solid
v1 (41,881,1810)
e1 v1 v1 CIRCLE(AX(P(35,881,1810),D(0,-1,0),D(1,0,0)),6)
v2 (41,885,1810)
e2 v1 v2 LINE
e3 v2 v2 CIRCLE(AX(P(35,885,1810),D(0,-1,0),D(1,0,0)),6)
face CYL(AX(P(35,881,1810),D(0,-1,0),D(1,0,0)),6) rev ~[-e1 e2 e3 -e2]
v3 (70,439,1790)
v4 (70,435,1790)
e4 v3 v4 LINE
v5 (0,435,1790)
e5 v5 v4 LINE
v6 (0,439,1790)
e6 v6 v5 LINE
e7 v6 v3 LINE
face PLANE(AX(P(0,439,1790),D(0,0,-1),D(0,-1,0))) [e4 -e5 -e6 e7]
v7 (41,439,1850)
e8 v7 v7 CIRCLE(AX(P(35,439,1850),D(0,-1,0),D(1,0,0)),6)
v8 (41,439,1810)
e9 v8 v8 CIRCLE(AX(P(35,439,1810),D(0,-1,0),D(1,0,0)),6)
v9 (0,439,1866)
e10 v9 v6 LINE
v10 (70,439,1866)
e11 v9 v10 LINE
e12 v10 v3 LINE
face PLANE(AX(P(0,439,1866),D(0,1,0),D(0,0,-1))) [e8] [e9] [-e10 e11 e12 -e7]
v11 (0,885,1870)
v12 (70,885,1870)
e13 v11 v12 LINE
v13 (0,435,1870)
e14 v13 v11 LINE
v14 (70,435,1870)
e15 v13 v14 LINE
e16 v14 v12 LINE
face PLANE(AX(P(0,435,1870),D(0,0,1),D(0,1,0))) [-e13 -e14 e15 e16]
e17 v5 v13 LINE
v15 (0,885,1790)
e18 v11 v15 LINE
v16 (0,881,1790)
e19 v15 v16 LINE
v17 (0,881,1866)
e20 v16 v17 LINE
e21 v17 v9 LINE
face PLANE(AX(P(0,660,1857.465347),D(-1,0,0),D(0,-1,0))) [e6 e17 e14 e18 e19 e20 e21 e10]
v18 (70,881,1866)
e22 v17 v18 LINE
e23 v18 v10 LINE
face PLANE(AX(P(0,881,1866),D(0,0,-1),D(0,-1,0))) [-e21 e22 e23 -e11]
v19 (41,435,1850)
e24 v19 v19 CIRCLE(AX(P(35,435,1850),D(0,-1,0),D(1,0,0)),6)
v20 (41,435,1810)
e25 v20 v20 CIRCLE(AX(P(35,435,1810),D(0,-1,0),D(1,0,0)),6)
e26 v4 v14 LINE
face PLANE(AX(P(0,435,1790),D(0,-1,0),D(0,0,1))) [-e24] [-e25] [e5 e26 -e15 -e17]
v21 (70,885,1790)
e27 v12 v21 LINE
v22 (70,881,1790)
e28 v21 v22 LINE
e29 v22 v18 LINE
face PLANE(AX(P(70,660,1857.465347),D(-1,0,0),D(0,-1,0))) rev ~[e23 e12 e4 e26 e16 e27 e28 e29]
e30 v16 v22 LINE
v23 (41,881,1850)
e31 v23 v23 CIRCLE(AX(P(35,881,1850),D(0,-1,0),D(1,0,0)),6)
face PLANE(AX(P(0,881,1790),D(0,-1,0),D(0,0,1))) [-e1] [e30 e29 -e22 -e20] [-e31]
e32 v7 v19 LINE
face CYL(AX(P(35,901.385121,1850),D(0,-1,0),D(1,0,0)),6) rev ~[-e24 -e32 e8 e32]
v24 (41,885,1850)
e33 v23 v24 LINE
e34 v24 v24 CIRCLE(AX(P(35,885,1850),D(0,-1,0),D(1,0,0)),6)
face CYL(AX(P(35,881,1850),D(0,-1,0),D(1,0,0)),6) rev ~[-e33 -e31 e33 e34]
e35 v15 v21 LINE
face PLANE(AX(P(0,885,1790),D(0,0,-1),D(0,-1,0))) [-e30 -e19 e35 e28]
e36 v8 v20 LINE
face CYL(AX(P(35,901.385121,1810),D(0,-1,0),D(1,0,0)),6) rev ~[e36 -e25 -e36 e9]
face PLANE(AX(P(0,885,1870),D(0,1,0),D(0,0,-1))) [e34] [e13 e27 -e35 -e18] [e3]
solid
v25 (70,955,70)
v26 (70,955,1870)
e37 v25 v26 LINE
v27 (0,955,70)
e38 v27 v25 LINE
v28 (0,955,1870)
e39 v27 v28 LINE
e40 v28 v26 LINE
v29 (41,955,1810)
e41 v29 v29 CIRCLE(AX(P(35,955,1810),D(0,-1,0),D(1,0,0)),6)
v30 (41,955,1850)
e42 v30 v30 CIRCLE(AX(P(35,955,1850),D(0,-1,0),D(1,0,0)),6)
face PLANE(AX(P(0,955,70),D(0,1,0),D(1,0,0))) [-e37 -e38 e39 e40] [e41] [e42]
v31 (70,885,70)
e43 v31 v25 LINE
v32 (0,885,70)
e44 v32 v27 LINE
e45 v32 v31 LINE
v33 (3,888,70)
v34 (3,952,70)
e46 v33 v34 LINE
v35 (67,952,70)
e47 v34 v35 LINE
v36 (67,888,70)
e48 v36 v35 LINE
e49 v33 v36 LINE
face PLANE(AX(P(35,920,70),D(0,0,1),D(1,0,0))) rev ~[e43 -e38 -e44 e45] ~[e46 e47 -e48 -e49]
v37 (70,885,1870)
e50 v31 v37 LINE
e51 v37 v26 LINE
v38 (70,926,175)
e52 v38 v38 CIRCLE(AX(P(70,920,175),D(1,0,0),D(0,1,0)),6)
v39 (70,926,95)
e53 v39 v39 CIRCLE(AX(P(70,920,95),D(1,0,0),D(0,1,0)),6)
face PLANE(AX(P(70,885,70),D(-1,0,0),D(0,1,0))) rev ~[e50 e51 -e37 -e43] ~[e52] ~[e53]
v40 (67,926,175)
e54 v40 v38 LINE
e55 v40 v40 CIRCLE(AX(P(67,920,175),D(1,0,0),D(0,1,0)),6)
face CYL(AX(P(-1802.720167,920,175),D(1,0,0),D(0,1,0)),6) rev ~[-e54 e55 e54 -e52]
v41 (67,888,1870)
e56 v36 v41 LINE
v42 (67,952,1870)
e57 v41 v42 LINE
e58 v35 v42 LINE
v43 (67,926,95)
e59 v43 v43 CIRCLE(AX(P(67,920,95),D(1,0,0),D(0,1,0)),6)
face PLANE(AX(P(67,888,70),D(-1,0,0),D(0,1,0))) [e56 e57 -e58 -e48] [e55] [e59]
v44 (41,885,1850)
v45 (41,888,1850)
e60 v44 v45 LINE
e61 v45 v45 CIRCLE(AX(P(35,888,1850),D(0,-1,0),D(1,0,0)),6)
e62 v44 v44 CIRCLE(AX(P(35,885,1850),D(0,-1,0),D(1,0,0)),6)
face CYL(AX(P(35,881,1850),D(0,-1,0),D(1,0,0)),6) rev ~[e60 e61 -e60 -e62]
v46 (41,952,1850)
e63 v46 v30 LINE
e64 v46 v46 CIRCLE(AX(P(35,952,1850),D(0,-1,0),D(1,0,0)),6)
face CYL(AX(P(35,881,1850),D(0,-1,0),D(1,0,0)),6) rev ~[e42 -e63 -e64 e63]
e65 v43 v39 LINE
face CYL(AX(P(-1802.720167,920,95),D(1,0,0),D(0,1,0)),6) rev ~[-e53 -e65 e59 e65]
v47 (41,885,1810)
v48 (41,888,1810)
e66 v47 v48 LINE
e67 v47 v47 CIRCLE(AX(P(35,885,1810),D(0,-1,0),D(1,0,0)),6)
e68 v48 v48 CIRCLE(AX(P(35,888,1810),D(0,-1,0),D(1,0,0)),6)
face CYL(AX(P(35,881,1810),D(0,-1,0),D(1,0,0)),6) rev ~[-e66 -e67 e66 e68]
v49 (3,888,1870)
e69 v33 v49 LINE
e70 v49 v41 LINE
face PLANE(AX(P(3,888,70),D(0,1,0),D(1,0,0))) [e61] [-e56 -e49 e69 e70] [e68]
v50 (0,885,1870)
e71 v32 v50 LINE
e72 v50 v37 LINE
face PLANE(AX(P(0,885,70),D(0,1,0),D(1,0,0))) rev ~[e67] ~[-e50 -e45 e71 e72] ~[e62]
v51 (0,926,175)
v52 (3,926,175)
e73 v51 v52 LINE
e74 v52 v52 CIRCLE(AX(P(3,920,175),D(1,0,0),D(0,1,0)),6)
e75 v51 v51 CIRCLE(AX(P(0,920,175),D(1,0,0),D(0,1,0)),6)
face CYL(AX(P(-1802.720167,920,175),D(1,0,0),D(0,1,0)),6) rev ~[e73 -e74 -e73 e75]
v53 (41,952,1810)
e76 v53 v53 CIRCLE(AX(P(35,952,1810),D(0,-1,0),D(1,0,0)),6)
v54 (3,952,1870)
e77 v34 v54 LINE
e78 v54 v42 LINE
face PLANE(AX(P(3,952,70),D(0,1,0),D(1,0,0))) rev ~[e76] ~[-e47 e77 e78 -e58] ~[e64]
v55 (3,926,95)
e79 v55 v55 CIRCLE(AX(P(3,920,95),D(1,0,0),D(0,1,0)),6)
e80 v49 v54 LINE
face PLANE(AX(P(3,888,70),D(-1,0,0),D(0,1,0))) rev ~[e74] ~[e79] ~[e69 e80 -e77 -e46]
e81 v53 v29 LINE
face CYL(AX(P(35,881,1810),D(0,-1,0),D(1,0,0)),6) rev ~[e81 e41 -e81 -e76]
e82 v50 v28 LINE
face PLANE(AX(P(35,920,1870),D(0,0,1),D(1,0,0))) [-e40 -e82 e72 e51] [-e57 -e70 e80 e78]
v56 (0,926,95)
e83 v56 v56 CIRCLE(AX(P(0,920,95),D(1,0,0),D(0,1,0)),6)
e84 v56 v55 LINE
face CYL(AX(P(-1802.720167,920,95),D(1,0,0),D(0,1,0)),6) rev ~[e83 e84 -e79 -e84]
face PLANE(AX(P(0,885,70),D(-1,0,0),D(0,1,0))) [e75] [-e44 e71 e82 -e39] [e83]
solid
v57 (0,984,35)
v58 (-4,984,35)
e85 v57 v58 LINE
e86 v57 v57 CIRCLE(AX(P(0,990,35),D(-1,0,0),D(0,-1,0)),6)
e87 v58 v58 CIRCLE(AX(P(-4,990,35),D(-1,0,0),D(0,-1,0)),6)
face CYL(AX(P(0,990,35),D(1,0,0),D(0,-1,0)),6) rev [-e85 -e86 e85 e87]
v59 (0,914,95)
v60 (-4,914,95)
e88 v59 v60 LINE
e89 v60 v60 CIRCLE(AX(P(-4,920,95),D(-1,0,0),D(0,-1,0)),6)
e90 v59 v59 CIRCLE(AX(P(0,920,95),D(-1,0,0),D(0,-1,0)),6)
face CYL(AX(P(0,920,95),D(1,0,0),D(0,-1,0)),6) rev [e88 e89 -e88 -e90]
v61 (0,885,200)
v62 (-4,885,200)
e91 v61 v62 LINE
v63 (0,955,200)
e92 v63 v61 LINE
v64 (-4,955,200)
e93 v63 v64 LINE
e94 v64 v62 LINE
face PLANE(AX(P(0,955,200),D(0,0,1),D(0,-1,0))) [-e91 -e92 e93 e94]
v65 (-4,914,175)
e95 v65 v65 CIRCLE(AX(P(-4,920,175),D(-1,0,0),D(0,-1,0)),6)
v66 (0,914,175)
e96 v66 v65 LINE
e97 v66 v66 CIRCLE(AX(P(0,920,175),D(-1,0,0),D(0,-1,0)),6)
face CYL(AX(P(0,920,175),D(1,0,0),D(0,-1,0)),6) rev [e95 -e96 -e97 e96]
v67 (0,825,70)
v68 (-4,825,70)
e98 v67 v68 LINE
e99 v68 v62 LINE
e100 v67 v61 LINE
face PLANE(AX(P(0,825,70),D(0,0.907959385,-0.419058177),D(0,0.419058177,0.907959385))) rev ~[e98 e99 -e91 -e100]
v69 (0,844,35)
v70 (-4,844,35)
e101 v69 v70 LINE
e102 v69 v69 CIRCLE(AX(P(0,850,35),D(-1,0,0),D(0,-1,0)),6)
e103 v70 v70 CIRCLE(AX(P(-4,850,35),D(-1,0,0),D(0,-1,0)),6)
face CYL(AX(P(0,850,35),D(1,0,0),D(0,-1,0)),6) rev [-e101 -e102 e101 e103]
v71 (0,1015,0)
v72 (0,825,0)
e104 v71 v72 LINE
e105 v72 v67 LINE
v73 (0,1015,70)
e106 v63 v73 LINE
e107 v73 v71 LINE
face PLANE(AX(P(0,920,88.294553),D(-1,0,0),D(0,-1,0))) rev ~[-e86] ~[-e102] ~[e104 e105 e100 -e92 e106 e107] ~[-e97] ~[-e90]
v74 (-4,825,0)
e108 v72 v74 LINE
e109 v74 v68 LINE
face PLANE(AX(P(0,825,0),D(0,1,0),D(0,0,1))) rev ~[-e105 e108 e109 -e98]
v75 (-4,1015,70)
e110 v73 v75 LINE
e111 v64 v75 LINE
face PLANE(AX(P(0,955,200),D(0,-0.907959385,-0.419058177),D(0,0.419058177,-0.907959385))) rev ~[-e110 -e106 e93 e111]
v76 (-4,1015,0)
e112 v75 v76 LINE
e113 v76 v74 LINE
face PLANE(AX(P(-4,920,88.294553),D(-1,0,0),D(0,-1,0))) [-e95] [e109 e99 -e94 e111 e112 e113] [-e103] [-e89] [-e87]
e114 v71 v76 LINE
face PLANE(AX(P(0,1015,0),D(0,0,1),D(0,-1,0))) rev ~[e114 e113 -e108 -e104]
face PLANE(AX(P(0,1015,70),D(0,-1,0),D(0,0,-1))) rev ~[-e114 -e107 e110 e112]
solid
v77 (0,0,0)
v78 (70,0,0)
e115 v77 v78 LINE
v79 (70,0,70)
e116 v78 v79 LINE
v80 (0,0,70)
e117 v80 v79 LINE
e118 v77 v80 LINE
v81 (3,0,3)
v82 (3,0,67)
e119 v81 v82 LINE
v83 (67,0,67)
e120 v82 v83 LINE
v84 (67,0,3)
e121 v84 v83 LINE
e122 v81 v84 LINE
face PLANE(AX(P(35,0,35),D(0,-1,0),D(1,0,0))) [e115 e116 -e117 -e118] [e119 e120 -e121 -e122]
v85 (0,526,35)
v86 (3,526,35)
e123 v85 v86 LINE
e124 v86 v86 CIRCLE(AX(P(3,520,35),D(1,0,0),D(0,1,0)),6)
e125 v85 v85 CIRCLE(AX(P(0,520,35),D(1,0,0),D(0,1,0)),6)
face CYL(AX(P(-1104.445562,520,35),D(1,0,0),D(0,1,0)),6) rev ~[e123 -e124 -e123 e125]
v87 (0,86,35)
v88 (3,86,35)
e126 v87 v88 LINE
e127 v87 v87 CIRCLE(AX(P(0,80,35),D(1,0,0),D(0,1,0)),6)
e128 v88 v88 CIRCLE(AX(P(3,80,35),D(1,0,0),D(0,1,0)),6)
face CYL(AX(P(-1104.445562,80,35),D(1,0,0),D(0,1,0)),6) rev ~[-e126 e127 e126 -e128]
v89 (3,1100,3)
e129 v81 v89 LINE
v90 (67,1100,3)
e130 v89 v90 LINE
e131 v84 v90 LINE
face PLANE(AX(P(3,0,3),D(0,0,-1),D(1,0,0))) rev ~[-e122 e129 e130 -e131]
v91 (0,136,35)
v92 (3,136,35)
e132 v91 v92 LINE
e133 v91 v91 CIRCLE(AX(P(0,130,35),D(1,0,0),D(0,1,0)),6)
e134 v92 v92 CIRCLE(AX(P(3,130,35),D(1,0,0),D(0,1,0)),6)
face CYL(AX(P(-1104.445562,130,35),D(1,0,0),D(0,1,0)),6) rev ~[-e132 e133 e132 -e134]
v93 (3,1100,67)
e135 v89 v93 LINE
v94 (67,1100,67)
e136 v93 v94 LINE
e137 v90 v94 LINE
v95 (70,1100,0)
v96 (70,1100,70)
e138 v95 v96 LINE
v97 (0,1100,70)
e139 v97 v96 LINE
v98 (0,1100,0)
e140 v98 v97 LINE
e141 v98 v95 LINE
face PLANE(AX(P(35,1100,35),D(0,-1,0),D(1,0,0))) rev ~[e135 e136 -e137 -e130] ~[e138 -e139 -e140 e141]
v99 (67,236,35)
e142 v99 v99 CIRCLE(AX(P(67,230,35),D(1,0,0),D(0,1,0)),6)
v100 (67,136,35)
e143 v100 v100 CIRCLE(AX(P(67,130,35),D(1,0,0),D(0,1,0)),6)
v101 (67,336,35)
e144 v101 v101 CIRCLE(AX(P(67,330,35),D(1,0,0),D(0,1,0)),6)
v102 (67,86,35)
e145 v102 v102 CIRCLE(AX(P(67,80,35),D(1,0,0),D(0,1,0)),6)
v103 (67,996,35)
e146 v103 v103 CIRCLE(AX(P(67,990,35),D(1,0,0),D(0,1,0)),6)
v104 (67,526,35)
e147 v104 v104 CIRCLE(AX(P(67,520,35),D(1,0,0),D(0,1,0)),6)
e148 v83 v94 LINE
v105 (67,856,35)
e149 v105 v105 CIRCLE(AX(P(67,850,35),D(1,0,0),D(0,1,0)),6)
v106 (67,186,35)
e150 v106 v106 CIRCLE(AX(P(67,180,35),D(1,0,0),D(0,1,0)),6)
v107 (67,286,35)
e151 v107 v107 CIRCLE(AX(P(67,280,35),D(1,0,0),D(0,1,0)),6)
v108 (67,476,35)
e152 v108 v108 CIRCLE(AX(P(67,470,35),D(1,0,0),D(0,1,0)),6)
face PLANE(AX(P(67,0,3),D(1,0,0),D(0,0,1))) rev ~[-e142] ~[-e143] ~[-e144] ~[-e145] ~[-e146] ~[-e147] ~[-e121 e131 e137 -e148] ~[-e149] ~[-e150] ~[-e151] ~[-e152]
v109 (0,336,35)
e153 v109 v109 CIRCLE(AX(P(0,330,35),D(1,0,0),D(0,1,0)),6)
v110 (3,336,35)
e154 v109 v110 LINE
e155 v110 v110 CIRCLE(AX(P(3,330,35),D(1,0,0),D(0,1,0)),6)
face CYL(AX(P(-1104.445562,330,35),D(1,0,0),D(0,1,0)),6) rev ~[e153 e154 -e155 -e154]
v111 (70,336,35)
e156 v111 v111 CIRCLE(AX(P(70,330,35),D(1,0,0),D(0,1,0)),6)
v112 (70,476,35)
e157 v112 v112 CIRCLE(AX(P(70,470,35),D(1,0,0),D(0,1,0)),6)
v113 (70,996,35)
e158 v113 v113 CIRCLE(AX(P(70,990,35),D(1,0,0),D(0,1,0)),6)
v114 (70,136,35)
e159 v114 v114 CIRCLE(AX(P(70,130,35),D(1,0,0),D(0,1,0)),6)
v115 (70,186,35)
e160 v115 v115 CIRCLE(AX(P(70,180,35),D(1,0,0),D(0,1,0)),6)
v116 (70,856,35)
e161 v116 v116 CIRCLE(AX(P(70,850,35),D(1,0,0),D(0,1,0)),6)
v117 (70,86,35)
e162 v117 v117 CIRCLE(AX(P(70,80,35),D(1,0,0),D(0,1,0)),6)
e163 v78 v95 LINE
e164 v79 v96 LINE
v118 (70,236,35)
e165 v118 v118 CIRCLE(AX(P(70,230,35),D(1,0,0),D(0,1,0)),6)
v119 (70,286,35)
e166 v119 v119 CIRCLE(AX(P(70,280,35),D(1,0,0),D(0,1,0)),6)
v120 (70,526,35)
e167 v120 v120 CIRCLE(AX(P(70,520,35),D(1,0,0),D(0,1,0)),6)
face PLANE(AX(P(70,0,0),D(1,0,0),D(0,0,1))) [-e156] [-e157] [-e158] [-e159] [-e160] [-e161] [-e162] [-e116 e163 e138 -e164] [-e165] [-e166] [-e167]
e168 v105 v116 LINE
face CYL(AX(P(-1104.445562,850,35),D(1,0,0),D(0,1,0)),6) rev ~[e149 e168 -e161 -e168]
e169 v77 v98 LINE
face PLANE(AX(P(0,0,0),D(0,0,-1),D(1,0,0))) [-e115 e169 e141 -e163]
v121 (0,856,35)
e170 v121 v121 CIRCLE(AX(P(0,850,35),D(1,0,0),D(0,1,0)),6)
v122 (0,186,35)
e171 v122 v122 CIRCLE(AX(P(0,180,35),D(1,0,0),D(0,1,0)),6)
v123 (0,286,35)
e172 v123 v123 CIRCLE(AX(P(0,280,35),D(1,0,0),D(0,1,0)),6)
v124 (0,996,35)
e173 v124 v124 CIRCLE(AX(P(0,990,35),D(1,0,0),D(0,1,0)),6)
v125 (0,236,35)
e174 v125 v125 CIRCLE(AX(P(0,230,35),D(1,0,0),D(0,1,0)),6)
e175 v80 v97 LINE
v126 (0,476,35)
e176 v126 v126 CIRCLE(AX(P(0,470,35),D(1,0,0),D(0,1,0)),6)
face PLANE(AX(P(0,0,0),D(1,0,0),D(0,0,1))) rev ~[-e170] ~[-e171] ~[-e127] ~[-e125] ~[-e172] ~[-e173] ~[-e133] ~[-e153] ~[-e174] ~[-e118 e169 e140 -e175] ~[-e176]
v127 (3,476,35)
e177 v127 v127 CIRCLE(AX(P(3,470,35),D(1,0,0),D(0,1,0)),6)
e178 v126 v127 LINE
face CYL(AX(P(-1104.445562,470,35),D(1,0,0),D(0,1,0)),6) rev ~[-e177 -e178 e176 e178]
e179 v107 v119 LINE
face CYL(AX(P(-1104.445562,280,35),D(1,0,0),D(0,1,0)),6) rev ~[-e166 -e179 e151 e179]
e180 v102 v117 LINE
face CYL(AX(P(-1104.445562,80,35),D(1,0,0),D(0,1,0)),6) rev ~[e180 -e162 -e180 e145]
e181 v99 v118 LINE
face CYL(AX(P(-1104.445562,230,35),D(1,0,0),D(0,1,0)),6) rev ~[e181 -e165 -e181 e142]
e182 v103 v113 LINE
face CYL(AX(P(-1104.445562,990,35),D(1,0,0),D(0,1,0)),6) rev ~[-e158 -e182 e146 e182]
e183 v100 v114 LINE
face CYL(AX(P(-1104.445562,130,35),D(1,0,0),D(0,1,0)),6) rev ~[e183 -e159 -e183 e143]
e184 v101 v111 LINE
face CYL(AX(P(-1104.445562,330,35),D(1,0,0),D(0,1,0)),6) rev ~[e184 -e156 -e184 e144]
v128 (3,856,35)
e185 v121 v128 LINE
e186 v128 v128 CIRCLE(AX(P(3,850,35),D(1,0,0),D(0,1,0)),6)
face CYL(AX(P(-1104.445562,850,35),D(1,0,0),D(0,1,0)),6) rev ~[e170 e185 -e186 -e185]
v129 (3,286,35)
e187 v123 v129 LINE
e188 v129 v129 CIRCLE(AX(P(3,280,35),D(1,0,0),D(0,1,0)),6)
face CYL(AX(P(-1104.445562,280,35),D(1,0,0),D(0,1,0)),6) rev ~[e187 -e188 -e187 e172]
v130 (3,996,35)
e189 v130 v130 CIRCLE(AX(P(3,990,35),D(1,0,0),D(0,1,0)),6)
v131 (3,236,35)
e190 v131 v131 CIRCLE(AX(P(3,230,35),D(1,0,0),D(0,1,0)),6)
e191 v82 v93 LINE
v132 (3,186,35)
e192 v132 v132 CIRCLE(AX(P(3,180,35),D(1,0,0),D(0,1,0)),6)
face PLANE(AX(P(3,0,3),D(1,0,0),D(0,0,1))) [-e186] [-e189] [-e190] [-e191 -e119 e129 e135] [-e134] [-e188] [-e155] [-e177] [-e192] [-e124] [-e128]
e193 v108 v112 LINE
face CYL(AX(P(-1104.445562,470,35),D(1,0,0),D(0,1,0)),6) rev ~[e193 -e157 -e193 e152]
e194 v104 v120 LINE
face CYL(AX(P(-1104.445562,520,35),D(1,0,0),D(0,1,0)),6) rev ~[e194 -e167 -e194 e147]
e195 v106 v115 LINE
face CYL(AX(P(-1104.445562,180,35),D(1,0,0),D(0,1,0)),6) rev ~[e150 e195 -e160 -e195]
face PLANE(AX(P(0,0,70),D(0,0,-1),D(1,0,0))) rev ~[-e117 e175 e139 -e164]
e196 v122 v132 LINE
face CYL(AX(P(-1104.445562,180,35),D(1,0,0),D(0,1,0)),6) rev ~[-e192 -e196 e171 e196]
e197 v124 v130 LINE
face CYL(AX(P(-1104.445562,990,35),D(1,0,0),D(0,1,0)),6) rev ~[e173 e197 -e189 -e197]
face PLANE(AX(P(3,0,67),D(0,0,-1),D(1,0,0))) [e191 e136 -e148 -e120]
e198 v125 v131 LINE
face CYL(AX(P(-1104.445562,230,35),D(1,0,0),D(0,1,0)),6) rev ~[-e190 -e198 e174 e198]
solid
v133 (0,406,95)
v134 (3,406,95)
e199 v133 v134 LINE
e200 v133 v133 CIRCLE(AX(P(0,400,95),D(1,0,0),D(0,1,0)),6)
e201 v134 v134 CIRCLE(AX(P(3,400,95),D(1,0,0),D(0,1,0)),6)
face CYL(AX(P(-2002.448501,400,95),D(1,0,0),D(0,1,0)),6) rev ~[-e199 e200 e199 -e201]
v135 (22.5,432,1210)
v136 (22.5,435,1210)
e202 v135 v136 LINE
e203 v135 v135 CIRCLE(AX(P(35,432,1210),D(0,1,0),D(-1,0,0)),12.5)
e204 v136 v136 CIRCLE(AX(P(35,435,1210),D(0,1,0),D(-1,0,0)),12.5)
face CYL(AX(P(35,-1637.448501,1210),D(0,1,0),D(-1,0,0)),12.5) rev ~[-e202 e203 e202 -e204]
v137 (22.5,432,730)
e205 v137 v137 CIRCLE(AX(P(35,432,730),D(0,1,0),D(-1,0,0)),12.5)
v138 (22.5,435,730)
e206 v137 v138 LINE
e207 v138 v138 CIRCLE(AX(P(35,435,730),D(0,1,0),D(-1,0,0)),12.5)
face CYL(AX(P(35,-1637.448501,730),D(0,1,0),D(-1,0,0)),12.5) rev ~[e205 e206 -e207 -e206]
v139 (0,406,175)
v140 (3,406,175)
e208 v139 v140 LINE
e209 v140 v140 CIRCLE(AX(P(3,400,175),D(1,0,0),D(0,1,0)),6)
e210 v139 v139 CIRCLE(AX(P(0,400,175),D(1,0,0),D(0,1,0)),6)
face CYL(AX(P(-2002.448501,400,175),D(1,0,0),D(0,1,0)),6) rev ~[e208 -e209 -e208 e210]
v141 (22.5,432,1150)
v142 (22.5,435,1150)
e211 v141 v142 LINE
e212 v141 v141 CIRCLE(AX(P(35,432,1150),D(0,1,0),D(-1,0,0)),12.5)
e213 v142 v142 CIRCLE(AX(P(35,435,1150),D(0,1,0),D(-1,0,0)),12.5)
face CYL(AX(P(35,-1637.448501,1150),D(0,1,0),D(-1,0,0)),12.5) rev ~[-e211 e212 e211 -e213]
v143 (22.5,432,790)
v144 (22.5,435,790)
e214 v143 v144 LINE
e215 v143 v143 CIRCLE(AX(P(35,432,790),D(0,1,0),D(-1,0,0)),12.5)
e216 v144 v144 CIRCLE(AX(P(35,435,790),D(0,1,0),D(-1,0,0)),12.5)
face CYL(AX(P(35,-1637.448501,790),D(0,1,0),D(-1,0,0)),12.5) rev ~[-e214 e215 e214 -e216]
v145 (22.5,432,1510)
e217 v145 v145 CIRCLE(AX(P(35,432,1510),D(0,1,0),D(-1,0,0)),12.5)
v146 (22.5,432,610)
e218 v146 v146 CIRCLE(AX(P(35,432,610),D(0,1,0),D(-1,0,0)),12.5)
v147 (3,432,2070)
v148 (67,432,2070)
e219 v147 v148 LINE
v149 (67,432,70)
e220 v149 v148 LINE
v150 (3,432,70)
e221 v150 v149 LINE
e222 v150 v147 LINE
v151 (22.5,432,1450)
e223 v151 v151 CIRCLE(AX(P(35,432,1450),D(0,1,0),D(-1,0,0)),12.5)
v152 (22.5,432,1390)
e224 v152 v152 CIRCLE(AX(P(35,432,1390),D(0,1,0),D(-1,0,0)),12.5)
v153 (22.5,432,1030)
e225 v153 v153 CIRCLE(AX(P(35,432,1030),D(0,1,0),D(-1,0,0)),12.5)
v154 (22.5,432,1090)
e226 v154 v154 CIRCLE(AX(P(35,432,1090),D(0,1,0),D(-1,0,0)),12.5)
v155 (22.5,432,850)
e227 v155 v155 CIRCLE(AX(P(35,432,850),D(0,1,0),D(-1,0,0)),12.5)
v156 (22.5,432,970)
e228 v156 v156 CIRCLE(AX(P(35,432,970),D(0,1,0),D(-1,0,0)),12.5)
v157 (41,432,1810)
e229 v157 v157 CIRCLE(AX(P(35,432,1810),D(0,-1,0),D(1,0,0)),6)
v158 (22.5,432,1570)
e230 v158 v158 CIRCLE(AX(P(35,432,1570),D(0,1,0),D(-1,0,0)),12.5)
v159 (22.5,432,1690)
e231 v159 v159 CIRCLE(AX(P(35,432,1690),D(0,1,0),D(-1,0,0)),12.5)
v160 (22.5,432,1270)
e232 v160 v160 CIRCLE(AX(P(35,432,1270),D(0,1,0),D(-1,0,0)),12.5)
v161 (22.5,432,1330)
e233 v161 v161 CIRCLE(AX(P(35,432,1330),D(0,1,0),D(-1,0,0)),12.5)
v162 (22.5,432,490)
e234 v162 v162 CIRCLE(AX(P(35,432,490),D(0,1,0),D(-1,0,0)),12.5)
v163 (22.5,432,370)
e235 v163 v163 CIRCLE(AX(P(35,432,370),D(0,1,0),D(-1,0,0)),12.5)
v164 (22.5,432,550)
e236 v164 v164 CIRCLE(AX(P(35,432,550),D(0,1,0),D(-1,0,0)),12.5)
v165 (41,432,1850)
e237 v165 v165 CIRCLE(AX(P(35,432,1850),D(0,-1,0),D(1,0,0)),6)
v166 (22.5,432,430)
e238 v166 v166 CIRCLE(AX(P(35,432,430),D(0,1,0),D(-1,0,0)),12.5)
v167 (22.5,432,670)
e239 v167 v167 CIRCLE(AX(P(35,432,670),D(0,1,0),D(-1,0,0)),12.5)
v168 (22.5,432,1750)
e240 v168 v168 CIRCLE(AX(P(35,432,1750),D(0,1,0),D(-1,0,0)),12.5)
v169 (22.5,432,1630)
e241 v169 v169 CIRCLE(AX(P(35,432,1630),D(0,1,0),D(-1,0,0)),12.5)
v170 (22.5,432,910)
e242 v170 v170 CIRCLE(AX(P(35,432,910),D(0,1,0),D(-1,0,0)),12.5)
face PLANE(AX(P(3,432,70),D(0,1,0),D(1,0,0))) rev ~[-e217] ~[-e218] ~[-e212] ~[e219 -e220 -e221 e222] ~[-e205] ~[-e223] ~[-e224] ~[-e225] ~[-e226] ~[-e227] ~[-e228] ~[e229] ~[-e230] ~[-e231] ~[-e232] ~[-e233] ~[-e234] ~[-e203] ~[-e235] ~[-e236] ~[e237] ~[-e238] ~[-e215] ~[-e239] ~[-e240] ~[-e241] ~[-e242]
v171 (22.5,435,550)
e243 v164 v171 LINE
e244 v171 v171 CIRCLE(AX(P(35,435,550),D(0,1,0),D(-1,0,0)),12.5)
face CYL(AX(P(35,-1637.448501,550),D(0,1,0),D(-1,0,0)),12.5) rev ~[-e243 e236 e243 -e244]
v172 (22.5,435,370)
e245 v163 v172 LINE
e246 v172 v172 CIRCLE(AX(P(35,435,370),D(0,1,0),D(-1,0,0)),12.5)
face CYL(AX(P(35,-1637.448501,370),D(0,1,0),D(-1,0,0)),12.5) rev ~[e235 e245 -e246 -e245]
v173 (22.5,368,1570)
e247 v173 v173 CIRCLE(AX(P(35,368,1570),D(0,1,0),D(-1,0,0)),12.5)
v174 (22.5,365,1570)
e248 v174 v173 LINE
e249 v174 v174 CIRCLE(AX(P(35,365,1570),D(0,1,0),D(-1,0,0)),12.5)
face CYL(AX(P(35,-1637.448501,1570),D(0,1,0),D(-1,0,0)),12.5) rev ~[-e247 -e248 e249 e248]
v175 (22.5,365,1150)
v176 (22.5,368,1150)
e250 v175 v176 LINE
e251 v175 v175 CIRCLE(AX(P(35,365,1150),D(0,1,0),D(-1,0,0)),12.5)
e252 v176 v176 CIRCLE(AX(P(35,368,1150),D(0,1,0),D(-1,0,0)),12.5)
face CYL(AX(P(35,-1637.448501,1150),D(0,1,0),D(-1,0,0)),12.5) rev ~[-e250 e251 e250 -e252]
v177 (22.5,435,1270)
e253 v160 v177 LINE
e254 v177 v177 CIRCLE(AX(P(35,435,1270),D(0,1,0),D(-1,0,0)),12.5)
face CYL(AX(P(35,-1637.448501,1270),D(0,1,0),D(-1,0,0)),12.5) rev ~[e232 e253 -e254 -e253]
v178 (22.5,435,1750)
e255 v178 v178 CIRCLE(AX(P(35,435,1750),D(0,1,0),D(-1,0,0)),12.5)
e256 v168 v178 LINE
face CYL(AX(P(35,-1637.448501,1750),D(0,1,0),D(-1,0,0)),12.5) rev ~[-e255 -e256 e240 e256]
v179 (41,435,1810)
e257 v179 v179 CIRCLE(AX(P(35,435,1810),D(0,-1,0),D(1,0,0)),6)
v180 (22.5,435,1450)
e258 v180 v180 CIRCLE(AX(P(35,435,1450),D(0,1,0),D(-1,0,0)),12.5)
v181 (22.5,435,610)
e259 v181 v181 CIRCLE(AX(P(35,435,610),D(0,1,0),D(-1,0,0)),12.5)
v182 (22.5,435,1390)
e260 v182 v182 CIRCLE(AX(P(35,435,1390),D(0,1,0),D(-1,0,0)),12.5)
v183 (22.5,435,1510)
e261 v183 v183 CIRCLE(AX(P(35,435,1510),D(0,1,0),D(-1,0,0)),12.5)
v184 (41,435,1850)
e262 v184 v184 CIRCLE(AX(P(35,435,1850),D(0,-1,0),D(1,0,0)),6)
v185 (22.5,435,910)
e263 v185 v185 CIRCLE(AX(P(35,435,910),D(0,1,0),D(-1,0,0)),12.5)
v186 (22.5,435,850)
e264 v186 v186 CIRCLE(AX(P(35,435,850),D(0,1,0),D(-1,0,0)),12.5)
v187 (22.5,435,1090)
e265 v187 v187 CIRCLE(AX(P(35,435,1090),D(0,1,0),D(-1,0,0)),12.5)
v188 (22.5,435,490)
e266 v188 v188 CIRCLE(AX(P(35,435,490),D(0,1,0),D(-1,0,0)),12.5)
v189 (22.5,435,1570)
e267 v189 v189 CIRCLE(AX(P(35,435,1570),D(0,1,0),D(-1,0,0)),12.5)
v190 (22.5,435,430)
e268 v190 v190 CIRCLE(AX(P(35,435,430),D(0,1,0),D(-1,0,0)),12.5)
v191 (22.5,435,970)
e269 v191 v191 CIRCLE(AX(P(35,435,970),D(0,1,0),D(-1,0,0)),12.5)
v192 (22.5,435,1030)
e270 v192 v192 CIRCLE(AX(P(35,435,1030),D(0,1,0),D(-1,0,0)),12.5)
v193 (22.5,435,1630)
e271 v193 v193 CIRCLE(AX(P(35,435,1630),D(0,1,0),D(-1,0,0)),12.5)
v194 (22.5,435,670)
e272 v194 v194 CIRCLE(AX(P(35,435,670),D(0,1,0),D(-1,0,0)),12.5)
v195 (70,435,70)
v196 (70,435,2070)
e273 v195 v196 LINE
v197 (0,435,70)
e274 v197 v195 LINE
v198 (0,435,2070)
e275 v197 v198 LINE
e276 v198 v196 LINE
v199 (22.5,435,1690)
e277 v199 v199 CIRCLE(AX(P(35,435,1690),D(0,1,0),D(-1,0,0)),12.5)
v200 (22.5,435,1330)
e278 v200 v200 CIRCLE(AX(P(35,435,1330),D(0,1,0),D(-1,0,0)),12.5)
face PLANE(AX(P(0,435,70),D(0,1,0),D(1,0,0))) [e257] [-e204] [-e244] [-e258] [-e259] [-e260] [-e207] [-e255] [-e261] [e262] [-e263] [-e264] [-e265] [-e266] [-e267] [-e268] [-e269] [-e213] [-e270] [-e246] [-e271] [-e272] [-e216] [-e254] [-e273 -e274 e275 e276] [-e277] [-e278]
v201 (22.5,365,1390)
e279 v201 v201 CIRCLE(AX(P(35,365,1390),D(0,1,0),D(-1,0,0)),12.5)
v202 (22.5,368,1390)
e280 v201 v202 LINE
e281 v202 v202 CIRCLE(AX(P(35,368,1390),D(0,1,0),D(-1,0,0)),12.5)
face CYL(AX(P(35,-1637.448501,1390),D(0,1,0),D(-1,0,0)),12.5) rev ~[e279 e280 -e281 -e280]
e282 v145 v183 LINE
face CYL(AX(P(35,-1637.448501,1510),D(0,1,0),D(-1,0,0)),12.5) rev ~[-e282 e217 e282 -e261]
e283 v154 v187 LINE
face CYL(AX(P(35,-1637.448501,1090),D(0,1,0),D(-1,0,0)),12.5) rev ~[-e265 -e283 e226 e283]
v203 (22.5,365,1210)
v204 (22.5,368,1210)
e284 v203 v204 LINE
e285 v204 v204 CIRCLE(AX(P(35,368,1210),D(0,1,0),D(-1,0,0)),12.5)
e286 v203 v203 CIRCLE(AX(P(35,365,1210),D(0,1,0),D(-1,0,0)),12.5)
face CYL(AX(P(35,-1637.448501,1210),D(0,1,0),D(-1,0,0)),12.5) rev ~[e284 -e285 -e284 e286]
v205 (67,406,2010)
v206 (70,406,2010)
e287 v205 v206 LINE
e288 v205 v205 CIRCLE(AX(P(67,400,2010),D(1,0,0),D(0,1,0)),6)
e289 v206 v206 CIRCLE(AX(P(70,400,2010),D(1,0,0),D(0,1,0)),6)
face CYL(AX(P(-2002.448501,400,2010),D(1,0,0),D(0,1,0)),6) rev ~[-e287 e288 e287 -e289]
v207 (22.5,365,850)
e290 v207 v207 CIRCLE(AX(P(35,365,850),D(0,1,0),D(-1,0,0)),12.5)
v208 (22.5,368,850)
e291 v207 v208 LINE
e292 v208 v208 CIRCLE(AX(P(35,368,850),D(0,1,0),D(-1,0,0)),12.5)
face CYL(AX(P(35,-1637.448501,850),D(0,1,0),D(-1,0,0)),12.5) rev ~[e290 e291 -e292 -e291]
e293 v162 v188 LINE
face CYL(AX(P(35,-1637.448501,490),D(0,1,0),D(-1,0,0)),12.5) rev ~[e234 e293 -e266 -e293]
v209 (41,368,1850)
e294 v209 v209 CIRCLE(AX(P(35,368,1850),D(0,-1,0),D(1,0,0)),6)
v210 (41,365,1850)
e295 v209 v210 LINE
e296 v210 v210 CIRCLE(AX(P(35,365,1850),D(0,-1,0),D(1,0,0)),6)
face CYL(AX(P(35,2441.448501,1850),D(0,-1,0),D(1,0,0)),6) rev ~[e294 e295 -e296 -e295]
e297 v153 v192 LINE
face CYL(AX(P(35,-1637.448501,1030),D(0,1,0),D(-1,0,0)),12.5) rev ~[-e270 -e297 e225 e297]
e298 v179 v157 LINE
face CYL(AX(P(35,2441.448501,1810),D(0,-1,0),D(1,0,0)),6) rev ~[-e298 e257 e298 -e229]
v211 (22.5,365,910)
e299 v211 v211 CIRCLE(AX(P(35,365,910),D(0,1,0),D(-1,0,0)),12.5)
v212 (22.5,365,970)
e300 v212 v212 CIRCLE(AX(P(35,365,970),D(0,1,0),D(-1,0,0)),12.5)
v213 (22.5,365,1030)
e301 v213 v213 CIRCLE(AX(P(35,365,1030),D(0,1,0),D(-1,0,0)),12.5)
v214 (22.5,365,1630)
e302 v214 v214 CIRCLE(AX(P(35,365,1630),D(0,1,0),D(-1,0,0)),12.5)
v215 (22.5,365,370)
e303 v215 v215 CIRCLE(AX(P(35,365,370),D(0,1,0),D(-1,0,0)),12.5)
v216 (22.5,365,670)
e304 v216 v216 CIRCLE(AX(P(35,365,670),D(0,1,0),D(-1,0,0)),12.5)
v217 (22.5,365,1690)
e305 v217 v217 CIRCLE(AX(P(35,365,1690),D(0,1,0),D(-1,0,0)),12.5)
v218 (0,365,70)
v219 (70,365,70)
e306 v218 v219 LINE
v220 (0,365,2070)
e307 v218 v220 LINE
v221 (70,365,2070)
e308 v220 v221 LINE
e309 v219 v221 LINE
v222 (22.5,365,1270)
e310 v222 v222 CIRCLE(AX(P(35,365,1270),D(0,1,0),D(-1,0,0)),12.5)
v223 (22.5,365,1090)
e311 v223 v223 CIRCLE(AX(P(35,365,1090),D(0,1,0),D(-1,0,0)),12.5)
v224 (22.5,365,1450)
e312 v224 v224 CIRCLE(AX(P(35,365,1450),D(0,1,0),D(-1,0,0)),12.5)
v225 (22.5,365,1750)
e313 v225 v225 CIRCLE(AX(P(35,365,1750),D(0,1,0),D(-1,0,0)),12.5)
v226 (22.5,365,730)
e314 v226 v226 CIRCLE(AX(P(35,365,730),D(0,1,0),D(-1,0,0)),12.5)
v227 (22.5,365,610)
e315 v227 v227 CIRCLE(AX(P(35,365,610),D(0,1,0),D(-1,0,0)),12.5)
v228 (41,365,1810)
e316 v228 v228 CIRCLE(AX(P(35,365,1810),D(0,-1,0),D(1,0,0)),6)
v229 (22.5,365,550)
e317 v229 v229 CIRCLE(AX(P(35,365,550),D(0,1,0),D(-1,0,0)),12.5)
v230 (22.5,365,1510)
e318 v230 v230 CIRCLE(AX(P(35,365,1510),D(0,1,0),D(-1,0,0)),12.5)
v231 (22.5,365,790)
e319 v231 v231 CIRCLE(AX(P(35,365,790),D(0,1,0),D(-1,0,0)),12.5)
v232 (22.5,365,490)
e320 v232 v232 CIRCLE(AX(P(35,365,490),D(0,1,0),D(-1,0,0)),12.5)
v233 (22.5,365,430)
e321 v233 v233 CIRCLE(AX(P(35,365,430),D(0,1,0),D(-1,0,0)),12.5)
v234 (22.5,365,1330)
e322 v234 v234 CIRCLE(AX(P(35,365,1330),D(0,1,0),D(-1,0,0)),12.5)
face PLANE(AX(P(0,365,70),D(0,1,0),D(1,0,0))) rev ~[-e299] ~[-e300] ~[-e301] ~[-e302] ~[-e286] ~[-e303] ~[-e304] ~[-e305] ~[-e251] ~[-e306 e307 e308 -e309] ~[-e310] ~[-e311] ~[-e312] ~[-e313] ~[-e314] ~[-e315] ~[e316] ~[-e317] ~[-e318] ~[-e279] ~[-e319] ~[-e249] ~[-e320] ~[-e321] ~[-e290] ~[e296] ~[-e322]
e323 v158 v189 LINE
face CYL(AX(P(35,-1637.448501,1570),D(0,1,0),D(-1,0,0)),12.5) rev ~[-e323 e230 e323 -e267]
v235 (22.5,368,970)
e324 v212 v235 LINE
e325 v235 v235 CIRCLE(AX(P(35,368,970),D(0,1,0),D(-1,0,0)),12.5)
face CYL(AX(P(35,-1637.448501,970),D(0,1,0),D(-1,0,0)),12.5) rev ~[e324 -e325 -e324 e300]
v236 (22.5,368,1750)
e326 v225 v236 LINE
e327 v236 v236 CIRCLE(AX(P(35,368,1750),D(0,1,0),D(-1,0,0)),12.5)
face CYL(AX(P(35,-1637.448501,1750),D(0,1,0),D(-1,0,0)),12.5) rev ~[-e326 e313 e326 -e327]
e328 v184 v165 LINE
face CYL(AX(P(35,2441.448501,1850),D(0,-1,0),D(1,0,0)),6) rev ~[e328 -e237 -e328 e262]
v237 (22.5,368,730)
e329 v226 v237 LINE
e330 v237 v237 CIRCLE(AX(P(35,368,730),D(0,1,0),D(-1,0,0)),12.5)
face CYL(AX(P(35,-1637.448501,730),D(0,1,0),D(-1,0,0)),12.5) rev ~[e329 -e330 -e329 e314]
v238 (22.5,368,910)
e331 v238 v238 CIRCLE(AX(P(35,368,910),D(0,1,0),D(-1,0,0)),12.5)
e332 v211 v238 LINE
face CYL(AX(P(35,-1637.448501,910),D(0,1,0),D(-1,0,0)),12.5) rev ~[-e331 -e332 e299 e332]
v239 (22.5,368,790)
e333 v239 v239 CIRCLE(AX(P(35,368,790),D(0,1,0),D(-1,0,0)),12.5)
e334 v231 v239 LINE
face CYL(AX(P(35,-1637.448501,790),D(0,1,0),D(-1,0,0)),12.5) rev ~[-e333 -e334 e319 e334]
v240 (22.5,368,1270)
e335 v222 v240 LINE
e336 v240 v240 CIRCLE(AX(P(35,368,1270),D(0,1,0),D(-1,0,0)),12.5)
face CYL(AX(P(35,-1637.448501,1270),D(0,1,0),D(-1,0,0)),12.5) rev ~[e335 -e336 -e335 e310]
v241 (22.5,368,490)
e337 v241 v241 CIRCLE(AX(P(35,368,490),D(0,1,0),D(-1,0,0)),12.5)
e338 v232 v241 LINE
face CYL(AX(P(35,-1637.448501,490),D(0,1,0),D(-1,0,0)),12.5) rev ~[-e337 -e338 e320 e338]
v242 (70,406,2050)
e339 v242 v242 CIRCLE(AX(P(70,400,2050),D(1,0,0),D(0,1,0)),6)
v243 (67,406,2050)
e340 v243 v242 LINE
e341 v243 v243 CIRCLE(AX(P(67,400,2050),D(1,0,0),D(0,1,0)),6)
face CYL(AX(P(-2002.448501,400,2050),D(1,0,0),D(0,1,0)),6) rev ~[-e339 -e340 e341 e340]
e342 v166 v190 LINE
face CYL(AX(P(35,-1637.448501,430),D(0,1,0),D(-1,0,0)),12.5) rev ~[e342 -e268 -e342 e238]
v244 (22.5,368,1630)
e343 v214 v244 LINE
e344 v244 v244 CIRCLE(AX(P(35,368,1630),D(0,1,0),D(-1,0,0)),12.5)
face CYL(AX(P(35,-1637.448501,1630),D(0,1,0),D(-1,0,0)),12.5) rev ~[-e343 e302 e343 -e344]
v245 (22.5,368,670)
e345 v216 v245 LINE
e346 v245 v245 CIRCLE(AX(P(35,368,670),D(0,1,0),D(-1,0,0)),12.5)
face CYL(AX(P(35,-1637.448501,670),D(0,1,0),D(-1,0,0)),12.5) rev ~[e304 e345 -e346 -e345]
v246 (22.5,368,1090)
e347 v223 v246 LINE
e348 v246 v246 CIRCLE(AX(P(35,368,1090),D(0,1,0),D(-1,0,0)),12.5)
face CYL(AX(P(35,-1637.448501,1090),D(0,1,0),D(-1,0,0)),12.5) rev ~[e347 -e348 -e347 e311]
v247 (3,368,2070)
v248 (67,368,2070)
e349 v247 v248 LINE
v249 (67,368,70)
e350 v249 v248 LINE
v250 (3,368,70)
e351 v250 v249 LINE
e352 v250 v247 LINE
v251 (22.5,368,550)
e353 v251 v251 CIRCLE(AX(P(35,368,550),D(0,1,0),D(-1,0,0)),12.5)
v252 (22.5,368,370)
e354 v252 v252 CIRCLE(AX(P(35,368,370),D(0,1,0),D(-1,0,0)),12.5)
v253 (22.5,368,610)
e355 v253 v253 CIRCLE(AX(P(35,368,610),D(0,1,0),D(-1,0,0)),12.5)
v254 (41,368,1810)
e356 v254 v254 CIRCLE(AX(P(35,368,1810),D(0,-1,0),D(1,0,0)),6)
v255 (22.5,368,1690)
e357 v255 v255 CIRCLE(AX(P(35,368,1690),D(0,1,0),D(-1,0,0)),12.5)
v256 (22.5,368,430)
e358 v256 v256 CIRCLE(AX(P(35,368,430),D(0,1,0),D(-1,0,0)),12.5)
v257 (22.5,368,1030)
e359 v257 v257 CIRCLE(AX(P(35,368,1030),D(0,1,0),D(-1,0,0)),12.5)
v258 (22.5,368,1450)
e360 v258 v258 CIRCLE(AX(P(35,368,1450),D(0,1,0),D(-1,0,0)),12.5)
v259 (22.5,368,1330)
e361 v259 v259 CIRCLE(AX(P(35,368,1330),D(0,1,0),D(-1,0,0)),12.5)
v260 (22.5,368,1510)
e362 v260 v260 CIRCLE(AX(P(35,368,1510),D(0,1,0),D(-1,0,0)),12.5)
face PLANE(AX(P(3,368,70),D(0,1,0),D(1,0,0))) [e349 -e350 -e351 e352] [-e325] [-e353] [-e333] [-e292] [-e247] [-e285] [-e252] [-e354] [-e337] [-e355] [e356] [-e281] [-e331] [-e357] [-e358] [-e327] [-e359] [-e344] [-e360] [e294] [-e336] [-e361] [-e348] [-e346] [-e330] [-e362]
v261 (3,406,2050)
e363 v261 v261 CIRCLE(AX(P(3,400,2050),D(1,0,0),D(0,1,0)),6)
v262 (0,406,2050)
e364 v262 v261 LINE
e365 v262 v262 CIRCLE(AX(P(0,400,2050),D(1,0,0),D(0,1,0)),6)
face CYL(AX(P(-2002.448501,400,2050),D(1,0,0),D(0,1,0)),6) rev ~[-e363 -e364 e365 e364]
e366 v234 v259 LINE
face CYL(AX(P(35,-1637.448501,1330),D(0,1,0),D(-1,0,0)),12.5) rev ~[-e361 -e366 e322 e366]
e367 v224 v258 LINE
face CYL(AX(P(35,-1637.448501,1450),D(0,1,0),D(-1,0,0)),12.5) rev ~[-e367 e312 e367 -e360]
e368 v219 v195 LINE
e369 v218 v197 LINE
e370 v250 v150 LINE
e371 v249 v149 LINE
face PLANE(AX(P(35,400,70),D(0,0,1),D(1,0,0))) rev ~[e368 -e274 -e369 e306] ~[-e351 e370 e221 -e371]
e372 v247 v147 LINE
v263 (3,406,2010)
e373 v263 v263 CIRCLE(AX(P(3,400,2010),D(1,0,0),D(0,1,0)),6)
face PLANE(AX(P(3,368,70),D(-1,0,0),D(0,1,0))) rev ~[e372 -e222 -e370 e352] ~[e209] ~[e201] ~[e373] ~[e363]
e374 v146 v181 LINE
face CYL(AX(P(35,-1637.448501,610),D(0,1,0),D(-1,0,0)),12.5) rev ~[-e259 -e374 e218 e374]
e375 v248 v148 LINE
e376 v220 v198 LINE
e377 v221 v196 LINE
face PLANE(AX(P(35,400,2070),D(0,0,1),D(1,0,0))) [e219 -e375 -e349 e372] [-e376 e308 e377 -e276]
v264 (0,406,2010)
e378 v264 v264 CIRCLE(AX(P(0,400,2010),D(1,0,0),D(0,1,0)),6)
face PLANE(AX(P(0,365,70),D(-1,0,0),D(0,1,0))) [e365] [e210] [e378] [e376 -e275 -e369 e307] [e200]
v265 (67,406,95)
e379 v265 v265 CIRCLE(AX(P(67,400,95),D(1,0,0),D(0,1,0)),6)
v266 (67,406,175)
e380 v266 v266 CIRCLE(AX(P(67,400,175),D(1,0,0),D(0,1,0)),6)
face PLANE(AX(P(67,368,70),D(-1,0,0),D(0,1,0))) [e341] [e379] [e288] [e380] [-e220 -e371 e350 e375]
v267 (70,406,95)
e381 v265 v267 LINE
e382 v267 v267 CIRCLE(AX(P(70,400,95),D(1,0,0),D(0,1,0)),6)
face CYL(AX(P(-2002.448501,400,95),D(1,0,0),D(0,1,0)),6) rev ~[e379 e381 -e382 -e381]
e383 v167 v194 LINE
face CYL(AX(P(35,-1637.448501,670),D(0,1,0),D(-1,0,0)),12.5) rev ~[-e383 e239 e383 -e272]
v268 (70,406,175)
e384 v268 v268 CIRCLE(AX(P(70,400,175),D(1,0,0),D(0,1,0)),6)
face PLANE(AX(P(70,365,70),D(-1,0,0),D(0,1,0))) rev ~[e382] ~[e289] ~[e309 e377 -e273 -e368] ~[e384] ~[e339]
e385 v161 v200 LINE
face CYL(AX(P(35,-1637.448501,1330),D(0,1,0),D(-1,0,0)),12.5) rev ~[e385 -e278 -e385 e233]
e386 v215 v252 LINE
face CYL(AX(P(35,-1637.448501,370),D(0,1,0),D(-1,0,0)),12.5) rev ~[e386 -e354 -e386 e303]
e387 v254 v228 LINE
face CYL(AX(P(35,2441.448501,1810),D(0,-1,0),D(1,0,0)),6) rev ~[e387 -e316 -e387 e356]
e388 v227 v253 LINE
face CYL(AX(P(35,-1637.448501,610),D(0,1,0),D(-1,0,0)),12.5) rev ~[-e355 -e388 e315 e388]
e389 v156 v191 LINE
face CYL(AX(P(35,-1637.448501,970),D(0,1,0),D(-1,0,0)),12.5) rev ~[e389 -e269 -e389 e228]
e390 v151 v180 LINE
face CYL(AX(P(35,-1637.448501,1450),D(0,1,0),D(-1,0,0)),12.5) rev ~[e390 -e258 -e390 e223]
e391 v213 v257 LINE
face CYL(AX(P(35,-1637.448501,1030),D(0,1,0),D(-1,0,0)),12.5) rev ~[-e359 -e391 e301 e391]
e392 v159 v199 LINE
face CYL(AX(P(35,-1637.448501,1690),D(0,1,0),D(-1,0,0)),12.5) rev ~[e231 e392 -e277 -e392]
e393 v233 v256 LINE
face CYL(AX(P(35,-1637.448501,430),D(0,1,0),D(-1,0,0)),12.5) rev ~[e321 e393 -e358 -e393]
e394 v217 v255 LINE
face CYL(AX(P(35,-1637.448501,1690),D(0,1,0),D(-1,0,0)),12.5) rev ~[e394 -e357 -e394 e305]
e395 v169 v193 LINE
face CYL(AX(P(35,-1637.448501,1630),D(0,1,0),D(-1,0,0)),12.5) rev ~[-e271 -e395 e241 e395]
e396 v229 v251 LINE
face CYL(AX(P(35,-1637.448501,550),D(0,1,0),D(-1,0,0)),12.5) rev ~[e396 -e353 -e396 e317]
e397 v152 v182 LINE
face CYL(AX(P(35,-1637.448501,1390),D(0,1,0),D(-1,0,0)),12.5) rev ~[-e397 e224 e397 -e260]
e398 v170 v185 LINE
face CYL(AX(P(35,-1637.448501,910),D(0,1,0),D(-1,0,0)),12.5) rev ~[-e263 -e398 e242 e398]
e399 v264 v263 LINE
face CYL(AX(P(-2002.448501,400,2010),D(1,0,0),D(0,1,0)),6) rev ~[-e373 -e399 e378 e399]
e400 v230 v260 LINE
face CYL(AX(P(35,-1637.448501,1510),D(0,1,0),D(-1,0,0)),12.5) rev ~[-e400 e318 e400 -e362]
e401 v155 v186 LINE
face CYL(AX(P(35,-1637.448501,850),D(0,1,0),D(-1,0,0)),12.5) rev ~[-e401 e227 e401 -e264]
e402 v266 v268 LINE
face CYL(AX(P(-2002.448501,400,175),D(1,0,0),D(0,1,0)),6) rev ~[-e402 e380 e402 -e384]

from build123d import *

# Parameters (mm, degrees)
F0_W        = 70
F0_H        = 70
F0_W_2      = 64
F0_H_2      = 64
F1_DEPTH    = 1100
F3_D        = 12
F4_W        = 70
F4_H        = 70
F4_W_2      = 64
F4_H_2      = 64
F5_DEPTH    = 2000
F7_D        = 25
F8_W        = 70
F8_H        = 70
F8_W_2      = 64
F8_H_2      = 64
F9_DEPTH    = 1800
F11_DEPTH   = 70
F13_D       = 12
F13_DEPTH   = 74.001
F13_2_D     = 12
F13_2_DEPTH = 74.001
F15_D       = 12
F15_2_D     = 12
F16_R       = 6
F16_W       = 70
F16_H       = 130
F17_DEPTH   = 4
F19_D       = 12
F21_D       = 12


# Not quite as in the source:
# - a feature names something its author has since deleted; it is built from what else it names


with BuildPart() as f1:
    # F0 (on Front) → F1 (new body)
    with BuildSketch(Plane.XZ):
        with Locations((35, 35)):
            Rectangle(F0_W, F0_H)
        with Locations((35, 35)):
            Rectangle(F0_W_2, F0_H_2, mode=Mode.SUBTRACT)
    extrude(amount=-F1_DEPTH)

    # F3 (through all)
    with Locations(Plane(origin=(0, 0, 0), x_dir=(0, -1, 0), z_dir=(-1, 0, 0))):
        with Locations((-990, 35), (-850, 35), (-520, 35), (-470, 35), (-330, 35), (-280, 35), (-230, 35), (-180, 35), (-130, 35), (-80, 35)):
            Hole(F3_D / 2)


with BuildPart() as f5:
    # F4 (on face) → F5 (new body)
    with BuildSketch(Plane.XY.offset(70)):
        with Locations((35, 400)):
            Rectangle(F4_W, F4_H)
        with Locations((35, 400)):
            Rectangle(F4_W_2, F4_H_2, mode=Mode.SUBTRACT)
    extrude(amount=F5_DEPTH)

    # F7 (through all)
    with Locations(Plane.XZ.offset(-365)):
        with Locations((35, 1510), (35, 1450), (35, 1390), (35, 1330), (35, 1270), (35, 1210), (35, 1150), (35, 1090), (35, 1030), (35, 970), (35, 910), (35, 850), (35, 790), (35, 730), (35, 670), (35, 610), (35, 550), (35, 490), (35, 430), (35, 370), (35, 1570), (35, 1630), (35, 1690), (35, 1750)):
            Hole(F7_D / 2)

    # F15 (through all)
    with Locations(Plane(origin=(0, 439, 0), x_dir=(-1, 0, 0), z_dir=(0, 1, 0))):
        with Locations((-35, 1850), (-35, 1810)):
            Hole(F15_D / 2)

    # F21 (through all)
    with Locations(Plane(origin=(0, 0, 0), x_dir=(0, -1, 0), z_dir=(-1, 0, 0))):
        with Locations((-400, 2050), (-400, 2010), (-400, 175), (-400, 95)):
            Hole(F21_D / 2)


with BuildPart() as f9:
    # F8 (on face) → F9 (new body)
    with BuildSketch(Plane.XY.offset(70)):
        with Locations((35, 920)):
            Rectangle(F8_W, F8_H)
        with Locations((35, 920)):
            Rectangle(F8_W_2, F8_H_2, mode=Mode.SUBTRACT)
    extrude(amount=F9_DEPTH)

    # F13 (through all, one way)
    with BuildSketch(Plane.XZ.offset(-881)):
        with Locations((35, 1850), (35, 1810)):
            Circle(F13_D / 2)
    extrude(amount=-F13_DEPTH, mode=Mode.SUBTRACT)

    # F19 (through all)
    with Locations(Plane(origin=(0, 0, 0), x_dir=(0, -1, 0), z_dir=(-1, 0, 0))):
        with Locations((-920, 175), (-920, 95)):
            Hole(F19_D / 2)


with BuildPart() as f11:
    # F10 (on face) → F11 (new body)
    with BuildSketch(Plane(origin=(0, 0, 0), x_dir=(0, -1, 0), z_dir=(-1, 0, 0))):
        Polygon((-435, 1870), (-885, 1870), (-885, 1790), (-881, 1790), (-881, 1866), (-439, 1866), (-439, 1790), (-435, 1790), align=None)
    extrude(amount=-F11_DEPTH)

    # F13#2 (through all, one way)
    with BuildSketch(Plane.XZ.offset(-881)):
        with Locations((35, 1850), (35, 1810)):
            Circle(F13_2_D / 2)
    extrude(amount=-F13_2_DEPTH, mode=Mode.SUBTRACT)

    # F15#2 (through all)
    with Locations(Plane(origin=(0, 439, 0), x_dir=(-1, 0, 0), z_dir=(0, 1, 0))):
        with Locations((-35, 1850), (-35, 1810)):
            Hole(F15_2_D / 2)


with BuildPart() as f17:
    # F16 (on face) → F17 (new body)
    with BuildSketch(Plane(origin=(0, 0, 0), x_dir=(0, -1, 0), z_dir=(-1, 0, 0))):
        Polygon((-955, 200), (-1015, 70), (-1015, 0), (-825, 0), (-825, 70), (-885, 200), (-885, 70), (-955, 70), align=None)
        with Locations((-990, 35)):
            Circle(F16_R, mode=Mode.SUBTRACT)
        with Locations((-850, 35)):
            Circle(F16_R, mode=Mode.SUBTRACT)
        with Locations((-920, 135)):
            Rectangle(F16_W, F16_H)
        with Locations((-920, 95)):
            Circle(F16_R, mode=Mode.SUBTRACT)
        with Locations((-920, 175)):
            Circle(F16_R, mode=Mode.SUBTRACT)
    extrude(amount=F17_DEPTH)


solid = Compound([f1.part, f5.part, f9.part, f11.part, f17.part])
